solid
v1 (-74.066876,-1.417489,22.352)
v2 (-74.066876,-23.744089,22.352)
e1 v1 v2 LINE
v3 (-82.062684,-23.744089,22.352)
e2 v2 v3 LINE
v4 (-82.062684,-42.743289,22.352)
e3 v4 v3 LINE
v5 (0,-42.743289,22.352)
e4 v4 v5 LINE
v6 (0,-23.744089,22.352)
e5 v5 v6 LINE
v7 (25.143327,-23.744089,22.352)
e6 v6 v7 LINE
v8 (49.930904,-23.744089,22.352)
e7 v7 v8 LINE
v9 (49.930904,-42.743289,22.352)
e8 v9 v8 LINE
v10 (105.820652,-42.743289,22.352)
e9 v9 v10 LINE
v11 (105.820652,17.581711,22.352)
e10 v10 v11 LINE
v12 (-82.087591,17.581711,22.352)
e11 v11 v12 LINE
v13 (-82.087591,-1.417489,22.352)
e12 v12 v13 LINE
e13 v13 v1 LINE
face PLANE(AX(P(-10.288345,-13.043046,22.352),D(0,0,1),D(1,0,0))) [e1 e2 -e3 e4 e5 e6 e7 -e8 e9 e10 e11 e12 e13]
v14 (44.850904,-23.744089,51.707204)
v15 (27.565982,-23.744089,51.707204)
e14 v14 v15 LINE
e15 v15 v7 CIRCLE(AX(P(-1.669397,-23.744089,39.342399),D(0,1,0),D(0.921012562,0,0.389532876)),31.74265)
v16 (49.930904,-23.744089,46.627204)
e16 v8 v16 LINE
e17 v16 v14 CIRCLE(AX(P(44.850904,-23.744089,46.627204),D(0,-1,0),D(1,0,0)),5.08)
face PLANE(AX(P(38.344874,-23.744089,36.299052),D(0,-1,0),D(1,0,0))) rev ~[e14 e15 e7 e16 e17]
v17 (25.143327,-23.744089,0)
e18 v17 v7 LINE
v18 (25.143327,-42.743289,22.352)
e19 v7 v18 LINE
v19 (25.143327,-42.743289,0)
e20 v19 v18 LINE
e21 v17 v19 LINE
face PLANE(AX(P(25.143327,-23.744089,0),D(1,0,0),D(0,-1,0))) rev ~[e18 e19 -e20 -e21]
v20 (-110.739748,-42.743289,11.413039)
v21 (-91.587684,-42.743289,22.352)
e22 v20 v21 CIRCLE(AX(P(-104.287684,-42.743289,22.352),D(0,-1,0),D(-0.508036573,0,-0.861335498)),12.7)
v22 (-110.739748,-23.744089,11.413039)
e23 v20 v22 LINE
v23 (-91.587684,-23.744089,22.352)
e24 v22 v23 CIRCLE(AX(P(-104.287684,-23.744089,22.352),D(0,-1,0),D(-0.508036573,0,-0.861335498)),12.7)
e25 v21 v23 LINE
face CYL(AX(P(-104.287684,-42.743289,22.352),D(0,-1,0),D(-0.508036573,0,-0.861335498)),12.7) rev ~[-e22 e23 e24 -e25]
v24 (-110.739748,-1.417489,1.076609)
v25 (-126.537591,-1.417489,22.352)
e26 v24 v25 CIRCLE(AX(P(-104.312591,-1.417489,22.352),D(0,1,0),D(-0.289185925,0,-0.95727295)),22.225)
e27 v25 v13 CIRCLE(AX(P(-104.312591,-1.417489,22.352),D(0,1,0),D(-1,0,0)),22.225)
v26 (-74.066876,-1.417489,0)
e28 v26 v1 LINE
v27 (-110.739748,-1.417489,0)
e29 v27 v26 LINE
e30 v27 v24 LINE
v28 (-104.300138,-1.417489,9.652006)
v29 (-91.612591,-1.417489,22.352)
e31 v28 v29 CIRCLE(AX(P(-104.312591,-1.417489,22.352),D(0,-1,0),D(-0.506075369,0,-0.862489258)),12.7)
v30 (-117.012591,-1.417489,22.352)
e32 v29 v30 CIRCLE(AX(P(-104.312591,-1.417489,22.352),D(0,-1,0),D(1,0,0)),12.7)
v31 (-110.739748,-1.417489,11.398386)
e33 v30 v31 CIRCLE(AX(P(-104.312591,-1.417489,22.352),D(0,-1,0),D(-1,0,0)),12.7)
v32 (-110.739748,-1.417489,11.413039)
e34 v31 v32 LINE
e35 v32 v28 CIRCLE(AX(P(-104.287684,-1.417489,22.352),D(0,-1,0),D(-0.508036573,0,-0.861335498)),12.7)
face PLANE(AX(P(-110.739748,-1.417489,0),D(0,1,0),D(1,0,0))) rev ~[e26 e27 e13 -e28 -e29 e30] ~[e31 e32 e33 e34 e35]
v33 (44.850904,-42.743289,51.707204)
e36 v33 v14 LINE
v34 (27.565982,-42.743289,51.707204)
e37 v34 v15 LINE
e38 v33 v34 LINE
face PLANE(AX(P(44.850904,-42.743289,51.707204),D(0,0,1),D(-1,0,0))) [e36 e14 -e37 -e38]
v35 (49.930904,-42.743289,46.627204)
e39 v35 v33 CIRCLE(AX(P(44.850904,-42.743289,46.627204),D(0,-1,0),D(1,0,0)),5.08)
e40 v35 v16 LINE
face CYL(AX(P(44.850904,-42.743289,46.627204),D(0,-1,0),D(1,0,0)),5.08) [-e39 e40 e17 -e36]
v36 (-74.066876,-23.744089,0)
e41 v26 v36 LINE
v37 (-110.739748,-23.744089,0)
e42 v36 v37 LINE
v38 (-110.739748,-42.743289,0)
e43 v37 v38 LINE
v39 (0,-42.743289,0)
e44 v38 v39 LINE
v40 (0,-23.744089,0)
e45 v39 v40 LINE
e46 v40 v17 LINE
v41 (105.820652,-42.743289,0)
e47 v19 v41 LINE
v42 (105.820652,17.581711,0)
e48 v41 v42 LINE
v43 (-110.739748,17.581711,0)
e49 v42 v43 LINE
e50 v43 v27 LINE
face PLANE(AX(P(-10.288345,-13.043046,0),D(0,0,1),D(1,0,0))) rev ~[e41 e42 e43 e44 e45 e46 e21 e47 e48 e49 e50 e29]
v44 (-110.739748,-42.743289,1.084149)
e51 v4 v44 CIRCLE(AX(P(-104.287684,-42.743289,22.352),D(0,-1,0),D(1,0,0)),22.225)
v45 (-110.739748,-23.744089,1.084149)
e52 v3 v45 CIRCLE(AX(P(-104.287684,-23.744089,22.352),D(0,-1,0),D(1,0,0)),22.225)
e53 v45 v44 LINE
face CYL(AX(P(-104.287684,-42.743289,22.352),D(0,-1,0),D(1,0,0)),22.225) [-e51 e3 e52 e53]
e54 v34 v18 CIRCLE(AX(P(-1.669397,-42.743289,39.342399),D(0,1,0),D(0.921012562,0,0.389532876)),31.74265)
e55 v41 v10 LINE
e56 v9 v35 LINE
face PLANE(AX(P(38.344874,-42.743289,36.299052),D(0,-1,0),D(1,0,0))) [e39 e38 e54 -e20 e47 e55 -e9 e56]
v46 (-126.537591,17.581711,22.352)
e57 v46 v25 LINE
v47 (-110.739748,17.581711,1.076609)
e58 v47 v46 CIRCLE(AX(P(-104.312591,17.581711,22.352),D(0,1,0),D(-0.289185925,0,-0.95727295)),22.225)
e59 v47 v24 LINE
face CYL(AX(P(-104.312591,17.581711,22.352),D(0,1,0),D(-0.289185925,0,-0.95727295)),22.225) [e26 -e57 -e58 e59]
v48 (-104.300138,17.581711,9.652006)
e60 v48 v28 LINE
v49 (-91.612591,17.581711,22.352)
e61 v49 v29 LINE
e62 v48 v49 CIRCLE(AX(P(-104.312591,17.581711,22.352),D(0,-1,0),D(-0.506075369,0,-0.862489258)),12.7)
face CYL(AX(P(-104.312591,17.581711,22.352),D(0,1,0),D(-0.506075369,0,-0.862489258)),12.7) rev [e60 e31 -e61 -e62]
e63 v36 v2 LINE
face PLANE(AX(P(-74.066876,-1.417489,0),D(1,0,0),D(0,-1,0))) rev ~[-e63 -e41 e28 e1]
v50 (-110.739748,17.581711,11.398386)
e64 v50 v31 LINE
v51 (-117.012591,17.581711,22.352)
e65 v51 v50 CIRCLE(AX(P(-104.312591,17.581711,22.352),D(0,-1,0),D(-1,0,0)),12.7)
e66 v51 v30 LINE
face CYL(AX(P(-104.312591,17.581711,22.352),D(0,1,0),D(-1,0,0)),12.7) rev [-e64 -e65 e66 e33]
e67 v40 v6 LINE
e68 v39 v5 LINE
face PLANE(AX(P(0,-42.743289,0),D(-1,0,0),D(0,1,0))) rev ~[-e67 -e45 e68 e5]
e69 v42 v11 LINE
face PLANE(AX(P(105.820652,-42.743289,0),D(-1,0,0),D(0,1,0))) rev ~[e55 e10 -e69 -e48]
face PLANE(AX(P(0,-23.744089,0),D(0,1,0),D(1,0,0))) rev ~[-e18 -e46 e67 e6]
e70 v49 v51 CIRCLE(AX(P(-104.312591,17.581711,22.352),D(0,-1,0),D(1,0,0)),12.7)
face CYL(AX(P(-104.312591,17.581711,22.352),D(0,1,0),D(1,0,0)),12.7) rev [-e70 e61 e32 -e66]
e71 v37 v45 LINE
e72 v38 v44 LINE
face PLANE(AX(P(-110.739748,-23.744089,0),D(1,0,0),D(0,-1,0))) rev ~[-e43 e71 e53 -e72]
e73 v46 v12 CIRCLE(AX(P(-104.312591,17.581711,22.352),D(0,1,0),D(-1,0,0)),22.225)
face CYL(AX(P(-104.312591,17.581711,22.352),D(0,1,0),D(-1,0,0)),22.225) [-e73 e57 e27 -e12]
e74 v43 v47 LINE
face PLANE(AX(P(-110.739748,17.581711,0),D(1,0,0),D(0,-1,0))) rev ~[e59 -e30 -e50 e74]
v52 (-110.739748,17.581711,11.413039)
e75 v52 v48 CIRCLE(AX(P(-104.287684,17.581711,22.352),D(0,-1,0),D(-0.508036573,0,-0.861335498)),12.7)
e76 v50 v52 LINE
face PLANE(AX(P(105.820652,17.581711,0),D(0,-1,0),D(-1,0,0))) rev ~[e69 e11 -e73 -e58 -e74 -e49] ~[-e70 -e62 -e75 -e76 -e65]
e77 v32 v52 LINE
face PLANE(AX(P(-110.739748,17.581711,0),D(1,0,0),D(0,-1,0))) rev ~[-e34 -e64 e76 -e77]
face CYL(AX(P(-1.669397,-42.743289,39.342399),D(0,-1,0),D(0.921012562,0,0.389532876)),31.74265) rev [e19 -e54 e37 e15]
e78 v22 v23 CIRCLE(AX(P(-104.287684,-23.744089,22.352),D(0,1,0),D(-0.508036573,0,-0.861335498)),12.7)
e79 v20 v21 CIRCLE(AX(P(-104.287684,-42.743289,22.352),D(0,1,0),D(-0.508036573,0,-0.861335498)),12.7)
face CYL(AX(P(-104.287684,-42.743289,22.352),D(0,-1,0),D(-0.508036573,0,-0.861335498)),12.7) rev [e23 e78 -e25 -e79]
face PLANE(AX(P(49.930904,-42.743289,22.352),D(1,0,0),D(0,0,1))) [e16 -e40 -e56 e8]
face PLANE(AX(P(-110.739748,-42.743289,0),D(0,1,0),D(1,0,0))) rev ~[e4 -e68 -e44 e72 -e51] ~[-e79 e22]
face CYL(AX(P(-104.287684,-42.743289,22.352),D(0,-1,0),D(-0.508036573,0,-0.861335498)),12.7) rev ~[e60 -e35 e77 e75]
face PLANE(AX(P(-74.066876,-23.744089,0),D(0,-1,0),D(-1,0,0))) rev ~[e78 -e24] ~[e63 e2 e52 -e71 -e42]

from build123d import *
from build123d import SkipClean  # not in build123d's __all__

# Parameters (mm, degrees)
F1_DEPTH = 22.352
F4_DEPTH = 60.326
F5_DEPTH = 18.9992
F6_DEPTH = 18.9992
F8_DEPTH = 18.9992


with BuildPart() as f1:
    # F0 (on Top) → F1 (new body)
    with BuildSketch(Plane.XY):
        Polygon((105.8206515543, 17.5817109668), (-110.7397484457, 17.5817109668), (-110.7397484457, -1.4174890332), (-74.0668755353, -1.4174890332), (-74.0668755353, -23.7440890332), (-110.7397484457, -23.7440890332), (-110.7397484457, -42.7432890332), (0, -42.7432890332), (0, -23.7440890332), (25.1433271915, -23.7440890332), (25.1433271915, -42.7432890332), (105.8206515543, -42.7432890332), align=None)
    extrude(amount=F1_DEPTH)

    # F2 (on face) → F4 (cut, through all)
    with BuildSketch(Plane.XZ.offset(42.7432890332)):
        with BuildLine():
            ThreePointArc((-110.7397484457, 11.4130391755), (-97.9889229317, 11.3240532527), (-91.5876839638, 22.352))
            Line((-91.5876839638, 22.352), (-110.7397484457, 22.352))
            Line((-110.7397484457, 22.352), (-110.7397484457, 11.4130391755))
        make_face()
    extrude(amount=-F4_DEPTH, mode=Mode.SUBTRACT)

    # F2 (on face) → F5 (join)
    with BuildSketch(Plane.XZ.offset(42.7432890332)):
        with BuildLine():
            ThreePointArc((-110.7397484457, 1.0841489351), (-91.0484715271, 4.5005608688), (-82.0626839638, 22.352))
            Line((-82.0626839638, 22.352), (-91.5876839638, 22.352))
            ThreePointArc((-91.5876839638, 22.352), (-97.9889229317, 11.3240532527), (-110.7397484457, 11.4130391755))
            Line((-110.7397484457, 11.4130391755), (-110.7397484457, 1.0841489351))
        make_face()
        with BuildLine():
            Line((-91.5876839638, 22.352), (-82.0626839638, 22.352))
            ThreePointArc((-82.0626839638, 22.352), (-117.5268964005, 40.2034391312), (-110.7397484457, 1.0841489351))
            Line((-110.7397484457, 1.0841489351), (-110.7397484457, 11.4130391755))
            ThreePointArc((-110.7397484457, 11.4130391755), (-110.5864449959, 33.3799467473), (-91.5876839638, 22.352))
        make_face()
    with SkipClean():  # cleaning this boolean's faces spoils the solid; the shape is the same uncleaned
        extrude(amount=-F5_DEPTH)

    # F3 (on face) → F6 (join)
    with BuildSketch(Plane(origin=(0, 17.5817109668, 0), x_dir=(-1, 0, 0), z_dir=(0, 1, 0))):
        with BuildLine():
            Line((91.6125912547, 22.352), (82.0875912547, 22.352))
            ThreePointArc((82.0875912547, 22.352), (91.062929817, 4.5083149326), (110.7397484457, 1.0766086889))
            Line((110.7397484457, 1.0766086889), (110.7397484457, 11.3983864208))
            ThreePointArc((110.7397484457, 11.3983864208), (98.0012877573, 11.331226517), (91.6125912547, 22.352))
        make_face()
        with BuildLine():
            ThreePointArc((110.7397484457, 1.0766086889), (122.1562763221, 9.1023385623), (126.5375912547, 22.352))
            ThreePointArc((126.5375912547, 22.352), (104.3125912547, 44.577), (82.0875912547, 22.352))
            Line((82.0875912547, 22.352), (91.6125912547, 22.352))
            ThreePointArc((91.6125912547, 22.352), (104.3125912547, 35.052), (117.0125912547, 22.352))
            ThreePointArc((117.0125912547, 22.352), (115.3333647377, 16.0406965025), (110.7397484457, 11.3983864208))
            Line((110.7397484457, 11.3983864208), (110.7397484457, 1.0766086889))
        make_face()
    extrude(amount=-F6_DEPTH)

    # F7 (on face) → F8 (join)
    with BuildSketch(Plane.XZ.offset(42.7432890332)):
        with BuildLine():
            Line((44.8509039521, 51.7072044313), (27.5659821928, 51.7072044313))
            ThreePointArc((27.5659821928, 51.7072044313), (29.9657018108, 36.7315861898), (25.1433271915, 22.352))
            Line((25.1433271915, 22.352), (49.9309039521, 22.352))
            Line((49.9309039521, 22.352), (49.9309039521, 46.6272044313))
            ThreePointArc((49.9309039521, 46.6272044313), (48.4430064005, 50.2193068797), (44.8509039521, 51.7072044313))
        make_face()
    extrude(amount=-F8_DEPTH)


solid = f1.part
